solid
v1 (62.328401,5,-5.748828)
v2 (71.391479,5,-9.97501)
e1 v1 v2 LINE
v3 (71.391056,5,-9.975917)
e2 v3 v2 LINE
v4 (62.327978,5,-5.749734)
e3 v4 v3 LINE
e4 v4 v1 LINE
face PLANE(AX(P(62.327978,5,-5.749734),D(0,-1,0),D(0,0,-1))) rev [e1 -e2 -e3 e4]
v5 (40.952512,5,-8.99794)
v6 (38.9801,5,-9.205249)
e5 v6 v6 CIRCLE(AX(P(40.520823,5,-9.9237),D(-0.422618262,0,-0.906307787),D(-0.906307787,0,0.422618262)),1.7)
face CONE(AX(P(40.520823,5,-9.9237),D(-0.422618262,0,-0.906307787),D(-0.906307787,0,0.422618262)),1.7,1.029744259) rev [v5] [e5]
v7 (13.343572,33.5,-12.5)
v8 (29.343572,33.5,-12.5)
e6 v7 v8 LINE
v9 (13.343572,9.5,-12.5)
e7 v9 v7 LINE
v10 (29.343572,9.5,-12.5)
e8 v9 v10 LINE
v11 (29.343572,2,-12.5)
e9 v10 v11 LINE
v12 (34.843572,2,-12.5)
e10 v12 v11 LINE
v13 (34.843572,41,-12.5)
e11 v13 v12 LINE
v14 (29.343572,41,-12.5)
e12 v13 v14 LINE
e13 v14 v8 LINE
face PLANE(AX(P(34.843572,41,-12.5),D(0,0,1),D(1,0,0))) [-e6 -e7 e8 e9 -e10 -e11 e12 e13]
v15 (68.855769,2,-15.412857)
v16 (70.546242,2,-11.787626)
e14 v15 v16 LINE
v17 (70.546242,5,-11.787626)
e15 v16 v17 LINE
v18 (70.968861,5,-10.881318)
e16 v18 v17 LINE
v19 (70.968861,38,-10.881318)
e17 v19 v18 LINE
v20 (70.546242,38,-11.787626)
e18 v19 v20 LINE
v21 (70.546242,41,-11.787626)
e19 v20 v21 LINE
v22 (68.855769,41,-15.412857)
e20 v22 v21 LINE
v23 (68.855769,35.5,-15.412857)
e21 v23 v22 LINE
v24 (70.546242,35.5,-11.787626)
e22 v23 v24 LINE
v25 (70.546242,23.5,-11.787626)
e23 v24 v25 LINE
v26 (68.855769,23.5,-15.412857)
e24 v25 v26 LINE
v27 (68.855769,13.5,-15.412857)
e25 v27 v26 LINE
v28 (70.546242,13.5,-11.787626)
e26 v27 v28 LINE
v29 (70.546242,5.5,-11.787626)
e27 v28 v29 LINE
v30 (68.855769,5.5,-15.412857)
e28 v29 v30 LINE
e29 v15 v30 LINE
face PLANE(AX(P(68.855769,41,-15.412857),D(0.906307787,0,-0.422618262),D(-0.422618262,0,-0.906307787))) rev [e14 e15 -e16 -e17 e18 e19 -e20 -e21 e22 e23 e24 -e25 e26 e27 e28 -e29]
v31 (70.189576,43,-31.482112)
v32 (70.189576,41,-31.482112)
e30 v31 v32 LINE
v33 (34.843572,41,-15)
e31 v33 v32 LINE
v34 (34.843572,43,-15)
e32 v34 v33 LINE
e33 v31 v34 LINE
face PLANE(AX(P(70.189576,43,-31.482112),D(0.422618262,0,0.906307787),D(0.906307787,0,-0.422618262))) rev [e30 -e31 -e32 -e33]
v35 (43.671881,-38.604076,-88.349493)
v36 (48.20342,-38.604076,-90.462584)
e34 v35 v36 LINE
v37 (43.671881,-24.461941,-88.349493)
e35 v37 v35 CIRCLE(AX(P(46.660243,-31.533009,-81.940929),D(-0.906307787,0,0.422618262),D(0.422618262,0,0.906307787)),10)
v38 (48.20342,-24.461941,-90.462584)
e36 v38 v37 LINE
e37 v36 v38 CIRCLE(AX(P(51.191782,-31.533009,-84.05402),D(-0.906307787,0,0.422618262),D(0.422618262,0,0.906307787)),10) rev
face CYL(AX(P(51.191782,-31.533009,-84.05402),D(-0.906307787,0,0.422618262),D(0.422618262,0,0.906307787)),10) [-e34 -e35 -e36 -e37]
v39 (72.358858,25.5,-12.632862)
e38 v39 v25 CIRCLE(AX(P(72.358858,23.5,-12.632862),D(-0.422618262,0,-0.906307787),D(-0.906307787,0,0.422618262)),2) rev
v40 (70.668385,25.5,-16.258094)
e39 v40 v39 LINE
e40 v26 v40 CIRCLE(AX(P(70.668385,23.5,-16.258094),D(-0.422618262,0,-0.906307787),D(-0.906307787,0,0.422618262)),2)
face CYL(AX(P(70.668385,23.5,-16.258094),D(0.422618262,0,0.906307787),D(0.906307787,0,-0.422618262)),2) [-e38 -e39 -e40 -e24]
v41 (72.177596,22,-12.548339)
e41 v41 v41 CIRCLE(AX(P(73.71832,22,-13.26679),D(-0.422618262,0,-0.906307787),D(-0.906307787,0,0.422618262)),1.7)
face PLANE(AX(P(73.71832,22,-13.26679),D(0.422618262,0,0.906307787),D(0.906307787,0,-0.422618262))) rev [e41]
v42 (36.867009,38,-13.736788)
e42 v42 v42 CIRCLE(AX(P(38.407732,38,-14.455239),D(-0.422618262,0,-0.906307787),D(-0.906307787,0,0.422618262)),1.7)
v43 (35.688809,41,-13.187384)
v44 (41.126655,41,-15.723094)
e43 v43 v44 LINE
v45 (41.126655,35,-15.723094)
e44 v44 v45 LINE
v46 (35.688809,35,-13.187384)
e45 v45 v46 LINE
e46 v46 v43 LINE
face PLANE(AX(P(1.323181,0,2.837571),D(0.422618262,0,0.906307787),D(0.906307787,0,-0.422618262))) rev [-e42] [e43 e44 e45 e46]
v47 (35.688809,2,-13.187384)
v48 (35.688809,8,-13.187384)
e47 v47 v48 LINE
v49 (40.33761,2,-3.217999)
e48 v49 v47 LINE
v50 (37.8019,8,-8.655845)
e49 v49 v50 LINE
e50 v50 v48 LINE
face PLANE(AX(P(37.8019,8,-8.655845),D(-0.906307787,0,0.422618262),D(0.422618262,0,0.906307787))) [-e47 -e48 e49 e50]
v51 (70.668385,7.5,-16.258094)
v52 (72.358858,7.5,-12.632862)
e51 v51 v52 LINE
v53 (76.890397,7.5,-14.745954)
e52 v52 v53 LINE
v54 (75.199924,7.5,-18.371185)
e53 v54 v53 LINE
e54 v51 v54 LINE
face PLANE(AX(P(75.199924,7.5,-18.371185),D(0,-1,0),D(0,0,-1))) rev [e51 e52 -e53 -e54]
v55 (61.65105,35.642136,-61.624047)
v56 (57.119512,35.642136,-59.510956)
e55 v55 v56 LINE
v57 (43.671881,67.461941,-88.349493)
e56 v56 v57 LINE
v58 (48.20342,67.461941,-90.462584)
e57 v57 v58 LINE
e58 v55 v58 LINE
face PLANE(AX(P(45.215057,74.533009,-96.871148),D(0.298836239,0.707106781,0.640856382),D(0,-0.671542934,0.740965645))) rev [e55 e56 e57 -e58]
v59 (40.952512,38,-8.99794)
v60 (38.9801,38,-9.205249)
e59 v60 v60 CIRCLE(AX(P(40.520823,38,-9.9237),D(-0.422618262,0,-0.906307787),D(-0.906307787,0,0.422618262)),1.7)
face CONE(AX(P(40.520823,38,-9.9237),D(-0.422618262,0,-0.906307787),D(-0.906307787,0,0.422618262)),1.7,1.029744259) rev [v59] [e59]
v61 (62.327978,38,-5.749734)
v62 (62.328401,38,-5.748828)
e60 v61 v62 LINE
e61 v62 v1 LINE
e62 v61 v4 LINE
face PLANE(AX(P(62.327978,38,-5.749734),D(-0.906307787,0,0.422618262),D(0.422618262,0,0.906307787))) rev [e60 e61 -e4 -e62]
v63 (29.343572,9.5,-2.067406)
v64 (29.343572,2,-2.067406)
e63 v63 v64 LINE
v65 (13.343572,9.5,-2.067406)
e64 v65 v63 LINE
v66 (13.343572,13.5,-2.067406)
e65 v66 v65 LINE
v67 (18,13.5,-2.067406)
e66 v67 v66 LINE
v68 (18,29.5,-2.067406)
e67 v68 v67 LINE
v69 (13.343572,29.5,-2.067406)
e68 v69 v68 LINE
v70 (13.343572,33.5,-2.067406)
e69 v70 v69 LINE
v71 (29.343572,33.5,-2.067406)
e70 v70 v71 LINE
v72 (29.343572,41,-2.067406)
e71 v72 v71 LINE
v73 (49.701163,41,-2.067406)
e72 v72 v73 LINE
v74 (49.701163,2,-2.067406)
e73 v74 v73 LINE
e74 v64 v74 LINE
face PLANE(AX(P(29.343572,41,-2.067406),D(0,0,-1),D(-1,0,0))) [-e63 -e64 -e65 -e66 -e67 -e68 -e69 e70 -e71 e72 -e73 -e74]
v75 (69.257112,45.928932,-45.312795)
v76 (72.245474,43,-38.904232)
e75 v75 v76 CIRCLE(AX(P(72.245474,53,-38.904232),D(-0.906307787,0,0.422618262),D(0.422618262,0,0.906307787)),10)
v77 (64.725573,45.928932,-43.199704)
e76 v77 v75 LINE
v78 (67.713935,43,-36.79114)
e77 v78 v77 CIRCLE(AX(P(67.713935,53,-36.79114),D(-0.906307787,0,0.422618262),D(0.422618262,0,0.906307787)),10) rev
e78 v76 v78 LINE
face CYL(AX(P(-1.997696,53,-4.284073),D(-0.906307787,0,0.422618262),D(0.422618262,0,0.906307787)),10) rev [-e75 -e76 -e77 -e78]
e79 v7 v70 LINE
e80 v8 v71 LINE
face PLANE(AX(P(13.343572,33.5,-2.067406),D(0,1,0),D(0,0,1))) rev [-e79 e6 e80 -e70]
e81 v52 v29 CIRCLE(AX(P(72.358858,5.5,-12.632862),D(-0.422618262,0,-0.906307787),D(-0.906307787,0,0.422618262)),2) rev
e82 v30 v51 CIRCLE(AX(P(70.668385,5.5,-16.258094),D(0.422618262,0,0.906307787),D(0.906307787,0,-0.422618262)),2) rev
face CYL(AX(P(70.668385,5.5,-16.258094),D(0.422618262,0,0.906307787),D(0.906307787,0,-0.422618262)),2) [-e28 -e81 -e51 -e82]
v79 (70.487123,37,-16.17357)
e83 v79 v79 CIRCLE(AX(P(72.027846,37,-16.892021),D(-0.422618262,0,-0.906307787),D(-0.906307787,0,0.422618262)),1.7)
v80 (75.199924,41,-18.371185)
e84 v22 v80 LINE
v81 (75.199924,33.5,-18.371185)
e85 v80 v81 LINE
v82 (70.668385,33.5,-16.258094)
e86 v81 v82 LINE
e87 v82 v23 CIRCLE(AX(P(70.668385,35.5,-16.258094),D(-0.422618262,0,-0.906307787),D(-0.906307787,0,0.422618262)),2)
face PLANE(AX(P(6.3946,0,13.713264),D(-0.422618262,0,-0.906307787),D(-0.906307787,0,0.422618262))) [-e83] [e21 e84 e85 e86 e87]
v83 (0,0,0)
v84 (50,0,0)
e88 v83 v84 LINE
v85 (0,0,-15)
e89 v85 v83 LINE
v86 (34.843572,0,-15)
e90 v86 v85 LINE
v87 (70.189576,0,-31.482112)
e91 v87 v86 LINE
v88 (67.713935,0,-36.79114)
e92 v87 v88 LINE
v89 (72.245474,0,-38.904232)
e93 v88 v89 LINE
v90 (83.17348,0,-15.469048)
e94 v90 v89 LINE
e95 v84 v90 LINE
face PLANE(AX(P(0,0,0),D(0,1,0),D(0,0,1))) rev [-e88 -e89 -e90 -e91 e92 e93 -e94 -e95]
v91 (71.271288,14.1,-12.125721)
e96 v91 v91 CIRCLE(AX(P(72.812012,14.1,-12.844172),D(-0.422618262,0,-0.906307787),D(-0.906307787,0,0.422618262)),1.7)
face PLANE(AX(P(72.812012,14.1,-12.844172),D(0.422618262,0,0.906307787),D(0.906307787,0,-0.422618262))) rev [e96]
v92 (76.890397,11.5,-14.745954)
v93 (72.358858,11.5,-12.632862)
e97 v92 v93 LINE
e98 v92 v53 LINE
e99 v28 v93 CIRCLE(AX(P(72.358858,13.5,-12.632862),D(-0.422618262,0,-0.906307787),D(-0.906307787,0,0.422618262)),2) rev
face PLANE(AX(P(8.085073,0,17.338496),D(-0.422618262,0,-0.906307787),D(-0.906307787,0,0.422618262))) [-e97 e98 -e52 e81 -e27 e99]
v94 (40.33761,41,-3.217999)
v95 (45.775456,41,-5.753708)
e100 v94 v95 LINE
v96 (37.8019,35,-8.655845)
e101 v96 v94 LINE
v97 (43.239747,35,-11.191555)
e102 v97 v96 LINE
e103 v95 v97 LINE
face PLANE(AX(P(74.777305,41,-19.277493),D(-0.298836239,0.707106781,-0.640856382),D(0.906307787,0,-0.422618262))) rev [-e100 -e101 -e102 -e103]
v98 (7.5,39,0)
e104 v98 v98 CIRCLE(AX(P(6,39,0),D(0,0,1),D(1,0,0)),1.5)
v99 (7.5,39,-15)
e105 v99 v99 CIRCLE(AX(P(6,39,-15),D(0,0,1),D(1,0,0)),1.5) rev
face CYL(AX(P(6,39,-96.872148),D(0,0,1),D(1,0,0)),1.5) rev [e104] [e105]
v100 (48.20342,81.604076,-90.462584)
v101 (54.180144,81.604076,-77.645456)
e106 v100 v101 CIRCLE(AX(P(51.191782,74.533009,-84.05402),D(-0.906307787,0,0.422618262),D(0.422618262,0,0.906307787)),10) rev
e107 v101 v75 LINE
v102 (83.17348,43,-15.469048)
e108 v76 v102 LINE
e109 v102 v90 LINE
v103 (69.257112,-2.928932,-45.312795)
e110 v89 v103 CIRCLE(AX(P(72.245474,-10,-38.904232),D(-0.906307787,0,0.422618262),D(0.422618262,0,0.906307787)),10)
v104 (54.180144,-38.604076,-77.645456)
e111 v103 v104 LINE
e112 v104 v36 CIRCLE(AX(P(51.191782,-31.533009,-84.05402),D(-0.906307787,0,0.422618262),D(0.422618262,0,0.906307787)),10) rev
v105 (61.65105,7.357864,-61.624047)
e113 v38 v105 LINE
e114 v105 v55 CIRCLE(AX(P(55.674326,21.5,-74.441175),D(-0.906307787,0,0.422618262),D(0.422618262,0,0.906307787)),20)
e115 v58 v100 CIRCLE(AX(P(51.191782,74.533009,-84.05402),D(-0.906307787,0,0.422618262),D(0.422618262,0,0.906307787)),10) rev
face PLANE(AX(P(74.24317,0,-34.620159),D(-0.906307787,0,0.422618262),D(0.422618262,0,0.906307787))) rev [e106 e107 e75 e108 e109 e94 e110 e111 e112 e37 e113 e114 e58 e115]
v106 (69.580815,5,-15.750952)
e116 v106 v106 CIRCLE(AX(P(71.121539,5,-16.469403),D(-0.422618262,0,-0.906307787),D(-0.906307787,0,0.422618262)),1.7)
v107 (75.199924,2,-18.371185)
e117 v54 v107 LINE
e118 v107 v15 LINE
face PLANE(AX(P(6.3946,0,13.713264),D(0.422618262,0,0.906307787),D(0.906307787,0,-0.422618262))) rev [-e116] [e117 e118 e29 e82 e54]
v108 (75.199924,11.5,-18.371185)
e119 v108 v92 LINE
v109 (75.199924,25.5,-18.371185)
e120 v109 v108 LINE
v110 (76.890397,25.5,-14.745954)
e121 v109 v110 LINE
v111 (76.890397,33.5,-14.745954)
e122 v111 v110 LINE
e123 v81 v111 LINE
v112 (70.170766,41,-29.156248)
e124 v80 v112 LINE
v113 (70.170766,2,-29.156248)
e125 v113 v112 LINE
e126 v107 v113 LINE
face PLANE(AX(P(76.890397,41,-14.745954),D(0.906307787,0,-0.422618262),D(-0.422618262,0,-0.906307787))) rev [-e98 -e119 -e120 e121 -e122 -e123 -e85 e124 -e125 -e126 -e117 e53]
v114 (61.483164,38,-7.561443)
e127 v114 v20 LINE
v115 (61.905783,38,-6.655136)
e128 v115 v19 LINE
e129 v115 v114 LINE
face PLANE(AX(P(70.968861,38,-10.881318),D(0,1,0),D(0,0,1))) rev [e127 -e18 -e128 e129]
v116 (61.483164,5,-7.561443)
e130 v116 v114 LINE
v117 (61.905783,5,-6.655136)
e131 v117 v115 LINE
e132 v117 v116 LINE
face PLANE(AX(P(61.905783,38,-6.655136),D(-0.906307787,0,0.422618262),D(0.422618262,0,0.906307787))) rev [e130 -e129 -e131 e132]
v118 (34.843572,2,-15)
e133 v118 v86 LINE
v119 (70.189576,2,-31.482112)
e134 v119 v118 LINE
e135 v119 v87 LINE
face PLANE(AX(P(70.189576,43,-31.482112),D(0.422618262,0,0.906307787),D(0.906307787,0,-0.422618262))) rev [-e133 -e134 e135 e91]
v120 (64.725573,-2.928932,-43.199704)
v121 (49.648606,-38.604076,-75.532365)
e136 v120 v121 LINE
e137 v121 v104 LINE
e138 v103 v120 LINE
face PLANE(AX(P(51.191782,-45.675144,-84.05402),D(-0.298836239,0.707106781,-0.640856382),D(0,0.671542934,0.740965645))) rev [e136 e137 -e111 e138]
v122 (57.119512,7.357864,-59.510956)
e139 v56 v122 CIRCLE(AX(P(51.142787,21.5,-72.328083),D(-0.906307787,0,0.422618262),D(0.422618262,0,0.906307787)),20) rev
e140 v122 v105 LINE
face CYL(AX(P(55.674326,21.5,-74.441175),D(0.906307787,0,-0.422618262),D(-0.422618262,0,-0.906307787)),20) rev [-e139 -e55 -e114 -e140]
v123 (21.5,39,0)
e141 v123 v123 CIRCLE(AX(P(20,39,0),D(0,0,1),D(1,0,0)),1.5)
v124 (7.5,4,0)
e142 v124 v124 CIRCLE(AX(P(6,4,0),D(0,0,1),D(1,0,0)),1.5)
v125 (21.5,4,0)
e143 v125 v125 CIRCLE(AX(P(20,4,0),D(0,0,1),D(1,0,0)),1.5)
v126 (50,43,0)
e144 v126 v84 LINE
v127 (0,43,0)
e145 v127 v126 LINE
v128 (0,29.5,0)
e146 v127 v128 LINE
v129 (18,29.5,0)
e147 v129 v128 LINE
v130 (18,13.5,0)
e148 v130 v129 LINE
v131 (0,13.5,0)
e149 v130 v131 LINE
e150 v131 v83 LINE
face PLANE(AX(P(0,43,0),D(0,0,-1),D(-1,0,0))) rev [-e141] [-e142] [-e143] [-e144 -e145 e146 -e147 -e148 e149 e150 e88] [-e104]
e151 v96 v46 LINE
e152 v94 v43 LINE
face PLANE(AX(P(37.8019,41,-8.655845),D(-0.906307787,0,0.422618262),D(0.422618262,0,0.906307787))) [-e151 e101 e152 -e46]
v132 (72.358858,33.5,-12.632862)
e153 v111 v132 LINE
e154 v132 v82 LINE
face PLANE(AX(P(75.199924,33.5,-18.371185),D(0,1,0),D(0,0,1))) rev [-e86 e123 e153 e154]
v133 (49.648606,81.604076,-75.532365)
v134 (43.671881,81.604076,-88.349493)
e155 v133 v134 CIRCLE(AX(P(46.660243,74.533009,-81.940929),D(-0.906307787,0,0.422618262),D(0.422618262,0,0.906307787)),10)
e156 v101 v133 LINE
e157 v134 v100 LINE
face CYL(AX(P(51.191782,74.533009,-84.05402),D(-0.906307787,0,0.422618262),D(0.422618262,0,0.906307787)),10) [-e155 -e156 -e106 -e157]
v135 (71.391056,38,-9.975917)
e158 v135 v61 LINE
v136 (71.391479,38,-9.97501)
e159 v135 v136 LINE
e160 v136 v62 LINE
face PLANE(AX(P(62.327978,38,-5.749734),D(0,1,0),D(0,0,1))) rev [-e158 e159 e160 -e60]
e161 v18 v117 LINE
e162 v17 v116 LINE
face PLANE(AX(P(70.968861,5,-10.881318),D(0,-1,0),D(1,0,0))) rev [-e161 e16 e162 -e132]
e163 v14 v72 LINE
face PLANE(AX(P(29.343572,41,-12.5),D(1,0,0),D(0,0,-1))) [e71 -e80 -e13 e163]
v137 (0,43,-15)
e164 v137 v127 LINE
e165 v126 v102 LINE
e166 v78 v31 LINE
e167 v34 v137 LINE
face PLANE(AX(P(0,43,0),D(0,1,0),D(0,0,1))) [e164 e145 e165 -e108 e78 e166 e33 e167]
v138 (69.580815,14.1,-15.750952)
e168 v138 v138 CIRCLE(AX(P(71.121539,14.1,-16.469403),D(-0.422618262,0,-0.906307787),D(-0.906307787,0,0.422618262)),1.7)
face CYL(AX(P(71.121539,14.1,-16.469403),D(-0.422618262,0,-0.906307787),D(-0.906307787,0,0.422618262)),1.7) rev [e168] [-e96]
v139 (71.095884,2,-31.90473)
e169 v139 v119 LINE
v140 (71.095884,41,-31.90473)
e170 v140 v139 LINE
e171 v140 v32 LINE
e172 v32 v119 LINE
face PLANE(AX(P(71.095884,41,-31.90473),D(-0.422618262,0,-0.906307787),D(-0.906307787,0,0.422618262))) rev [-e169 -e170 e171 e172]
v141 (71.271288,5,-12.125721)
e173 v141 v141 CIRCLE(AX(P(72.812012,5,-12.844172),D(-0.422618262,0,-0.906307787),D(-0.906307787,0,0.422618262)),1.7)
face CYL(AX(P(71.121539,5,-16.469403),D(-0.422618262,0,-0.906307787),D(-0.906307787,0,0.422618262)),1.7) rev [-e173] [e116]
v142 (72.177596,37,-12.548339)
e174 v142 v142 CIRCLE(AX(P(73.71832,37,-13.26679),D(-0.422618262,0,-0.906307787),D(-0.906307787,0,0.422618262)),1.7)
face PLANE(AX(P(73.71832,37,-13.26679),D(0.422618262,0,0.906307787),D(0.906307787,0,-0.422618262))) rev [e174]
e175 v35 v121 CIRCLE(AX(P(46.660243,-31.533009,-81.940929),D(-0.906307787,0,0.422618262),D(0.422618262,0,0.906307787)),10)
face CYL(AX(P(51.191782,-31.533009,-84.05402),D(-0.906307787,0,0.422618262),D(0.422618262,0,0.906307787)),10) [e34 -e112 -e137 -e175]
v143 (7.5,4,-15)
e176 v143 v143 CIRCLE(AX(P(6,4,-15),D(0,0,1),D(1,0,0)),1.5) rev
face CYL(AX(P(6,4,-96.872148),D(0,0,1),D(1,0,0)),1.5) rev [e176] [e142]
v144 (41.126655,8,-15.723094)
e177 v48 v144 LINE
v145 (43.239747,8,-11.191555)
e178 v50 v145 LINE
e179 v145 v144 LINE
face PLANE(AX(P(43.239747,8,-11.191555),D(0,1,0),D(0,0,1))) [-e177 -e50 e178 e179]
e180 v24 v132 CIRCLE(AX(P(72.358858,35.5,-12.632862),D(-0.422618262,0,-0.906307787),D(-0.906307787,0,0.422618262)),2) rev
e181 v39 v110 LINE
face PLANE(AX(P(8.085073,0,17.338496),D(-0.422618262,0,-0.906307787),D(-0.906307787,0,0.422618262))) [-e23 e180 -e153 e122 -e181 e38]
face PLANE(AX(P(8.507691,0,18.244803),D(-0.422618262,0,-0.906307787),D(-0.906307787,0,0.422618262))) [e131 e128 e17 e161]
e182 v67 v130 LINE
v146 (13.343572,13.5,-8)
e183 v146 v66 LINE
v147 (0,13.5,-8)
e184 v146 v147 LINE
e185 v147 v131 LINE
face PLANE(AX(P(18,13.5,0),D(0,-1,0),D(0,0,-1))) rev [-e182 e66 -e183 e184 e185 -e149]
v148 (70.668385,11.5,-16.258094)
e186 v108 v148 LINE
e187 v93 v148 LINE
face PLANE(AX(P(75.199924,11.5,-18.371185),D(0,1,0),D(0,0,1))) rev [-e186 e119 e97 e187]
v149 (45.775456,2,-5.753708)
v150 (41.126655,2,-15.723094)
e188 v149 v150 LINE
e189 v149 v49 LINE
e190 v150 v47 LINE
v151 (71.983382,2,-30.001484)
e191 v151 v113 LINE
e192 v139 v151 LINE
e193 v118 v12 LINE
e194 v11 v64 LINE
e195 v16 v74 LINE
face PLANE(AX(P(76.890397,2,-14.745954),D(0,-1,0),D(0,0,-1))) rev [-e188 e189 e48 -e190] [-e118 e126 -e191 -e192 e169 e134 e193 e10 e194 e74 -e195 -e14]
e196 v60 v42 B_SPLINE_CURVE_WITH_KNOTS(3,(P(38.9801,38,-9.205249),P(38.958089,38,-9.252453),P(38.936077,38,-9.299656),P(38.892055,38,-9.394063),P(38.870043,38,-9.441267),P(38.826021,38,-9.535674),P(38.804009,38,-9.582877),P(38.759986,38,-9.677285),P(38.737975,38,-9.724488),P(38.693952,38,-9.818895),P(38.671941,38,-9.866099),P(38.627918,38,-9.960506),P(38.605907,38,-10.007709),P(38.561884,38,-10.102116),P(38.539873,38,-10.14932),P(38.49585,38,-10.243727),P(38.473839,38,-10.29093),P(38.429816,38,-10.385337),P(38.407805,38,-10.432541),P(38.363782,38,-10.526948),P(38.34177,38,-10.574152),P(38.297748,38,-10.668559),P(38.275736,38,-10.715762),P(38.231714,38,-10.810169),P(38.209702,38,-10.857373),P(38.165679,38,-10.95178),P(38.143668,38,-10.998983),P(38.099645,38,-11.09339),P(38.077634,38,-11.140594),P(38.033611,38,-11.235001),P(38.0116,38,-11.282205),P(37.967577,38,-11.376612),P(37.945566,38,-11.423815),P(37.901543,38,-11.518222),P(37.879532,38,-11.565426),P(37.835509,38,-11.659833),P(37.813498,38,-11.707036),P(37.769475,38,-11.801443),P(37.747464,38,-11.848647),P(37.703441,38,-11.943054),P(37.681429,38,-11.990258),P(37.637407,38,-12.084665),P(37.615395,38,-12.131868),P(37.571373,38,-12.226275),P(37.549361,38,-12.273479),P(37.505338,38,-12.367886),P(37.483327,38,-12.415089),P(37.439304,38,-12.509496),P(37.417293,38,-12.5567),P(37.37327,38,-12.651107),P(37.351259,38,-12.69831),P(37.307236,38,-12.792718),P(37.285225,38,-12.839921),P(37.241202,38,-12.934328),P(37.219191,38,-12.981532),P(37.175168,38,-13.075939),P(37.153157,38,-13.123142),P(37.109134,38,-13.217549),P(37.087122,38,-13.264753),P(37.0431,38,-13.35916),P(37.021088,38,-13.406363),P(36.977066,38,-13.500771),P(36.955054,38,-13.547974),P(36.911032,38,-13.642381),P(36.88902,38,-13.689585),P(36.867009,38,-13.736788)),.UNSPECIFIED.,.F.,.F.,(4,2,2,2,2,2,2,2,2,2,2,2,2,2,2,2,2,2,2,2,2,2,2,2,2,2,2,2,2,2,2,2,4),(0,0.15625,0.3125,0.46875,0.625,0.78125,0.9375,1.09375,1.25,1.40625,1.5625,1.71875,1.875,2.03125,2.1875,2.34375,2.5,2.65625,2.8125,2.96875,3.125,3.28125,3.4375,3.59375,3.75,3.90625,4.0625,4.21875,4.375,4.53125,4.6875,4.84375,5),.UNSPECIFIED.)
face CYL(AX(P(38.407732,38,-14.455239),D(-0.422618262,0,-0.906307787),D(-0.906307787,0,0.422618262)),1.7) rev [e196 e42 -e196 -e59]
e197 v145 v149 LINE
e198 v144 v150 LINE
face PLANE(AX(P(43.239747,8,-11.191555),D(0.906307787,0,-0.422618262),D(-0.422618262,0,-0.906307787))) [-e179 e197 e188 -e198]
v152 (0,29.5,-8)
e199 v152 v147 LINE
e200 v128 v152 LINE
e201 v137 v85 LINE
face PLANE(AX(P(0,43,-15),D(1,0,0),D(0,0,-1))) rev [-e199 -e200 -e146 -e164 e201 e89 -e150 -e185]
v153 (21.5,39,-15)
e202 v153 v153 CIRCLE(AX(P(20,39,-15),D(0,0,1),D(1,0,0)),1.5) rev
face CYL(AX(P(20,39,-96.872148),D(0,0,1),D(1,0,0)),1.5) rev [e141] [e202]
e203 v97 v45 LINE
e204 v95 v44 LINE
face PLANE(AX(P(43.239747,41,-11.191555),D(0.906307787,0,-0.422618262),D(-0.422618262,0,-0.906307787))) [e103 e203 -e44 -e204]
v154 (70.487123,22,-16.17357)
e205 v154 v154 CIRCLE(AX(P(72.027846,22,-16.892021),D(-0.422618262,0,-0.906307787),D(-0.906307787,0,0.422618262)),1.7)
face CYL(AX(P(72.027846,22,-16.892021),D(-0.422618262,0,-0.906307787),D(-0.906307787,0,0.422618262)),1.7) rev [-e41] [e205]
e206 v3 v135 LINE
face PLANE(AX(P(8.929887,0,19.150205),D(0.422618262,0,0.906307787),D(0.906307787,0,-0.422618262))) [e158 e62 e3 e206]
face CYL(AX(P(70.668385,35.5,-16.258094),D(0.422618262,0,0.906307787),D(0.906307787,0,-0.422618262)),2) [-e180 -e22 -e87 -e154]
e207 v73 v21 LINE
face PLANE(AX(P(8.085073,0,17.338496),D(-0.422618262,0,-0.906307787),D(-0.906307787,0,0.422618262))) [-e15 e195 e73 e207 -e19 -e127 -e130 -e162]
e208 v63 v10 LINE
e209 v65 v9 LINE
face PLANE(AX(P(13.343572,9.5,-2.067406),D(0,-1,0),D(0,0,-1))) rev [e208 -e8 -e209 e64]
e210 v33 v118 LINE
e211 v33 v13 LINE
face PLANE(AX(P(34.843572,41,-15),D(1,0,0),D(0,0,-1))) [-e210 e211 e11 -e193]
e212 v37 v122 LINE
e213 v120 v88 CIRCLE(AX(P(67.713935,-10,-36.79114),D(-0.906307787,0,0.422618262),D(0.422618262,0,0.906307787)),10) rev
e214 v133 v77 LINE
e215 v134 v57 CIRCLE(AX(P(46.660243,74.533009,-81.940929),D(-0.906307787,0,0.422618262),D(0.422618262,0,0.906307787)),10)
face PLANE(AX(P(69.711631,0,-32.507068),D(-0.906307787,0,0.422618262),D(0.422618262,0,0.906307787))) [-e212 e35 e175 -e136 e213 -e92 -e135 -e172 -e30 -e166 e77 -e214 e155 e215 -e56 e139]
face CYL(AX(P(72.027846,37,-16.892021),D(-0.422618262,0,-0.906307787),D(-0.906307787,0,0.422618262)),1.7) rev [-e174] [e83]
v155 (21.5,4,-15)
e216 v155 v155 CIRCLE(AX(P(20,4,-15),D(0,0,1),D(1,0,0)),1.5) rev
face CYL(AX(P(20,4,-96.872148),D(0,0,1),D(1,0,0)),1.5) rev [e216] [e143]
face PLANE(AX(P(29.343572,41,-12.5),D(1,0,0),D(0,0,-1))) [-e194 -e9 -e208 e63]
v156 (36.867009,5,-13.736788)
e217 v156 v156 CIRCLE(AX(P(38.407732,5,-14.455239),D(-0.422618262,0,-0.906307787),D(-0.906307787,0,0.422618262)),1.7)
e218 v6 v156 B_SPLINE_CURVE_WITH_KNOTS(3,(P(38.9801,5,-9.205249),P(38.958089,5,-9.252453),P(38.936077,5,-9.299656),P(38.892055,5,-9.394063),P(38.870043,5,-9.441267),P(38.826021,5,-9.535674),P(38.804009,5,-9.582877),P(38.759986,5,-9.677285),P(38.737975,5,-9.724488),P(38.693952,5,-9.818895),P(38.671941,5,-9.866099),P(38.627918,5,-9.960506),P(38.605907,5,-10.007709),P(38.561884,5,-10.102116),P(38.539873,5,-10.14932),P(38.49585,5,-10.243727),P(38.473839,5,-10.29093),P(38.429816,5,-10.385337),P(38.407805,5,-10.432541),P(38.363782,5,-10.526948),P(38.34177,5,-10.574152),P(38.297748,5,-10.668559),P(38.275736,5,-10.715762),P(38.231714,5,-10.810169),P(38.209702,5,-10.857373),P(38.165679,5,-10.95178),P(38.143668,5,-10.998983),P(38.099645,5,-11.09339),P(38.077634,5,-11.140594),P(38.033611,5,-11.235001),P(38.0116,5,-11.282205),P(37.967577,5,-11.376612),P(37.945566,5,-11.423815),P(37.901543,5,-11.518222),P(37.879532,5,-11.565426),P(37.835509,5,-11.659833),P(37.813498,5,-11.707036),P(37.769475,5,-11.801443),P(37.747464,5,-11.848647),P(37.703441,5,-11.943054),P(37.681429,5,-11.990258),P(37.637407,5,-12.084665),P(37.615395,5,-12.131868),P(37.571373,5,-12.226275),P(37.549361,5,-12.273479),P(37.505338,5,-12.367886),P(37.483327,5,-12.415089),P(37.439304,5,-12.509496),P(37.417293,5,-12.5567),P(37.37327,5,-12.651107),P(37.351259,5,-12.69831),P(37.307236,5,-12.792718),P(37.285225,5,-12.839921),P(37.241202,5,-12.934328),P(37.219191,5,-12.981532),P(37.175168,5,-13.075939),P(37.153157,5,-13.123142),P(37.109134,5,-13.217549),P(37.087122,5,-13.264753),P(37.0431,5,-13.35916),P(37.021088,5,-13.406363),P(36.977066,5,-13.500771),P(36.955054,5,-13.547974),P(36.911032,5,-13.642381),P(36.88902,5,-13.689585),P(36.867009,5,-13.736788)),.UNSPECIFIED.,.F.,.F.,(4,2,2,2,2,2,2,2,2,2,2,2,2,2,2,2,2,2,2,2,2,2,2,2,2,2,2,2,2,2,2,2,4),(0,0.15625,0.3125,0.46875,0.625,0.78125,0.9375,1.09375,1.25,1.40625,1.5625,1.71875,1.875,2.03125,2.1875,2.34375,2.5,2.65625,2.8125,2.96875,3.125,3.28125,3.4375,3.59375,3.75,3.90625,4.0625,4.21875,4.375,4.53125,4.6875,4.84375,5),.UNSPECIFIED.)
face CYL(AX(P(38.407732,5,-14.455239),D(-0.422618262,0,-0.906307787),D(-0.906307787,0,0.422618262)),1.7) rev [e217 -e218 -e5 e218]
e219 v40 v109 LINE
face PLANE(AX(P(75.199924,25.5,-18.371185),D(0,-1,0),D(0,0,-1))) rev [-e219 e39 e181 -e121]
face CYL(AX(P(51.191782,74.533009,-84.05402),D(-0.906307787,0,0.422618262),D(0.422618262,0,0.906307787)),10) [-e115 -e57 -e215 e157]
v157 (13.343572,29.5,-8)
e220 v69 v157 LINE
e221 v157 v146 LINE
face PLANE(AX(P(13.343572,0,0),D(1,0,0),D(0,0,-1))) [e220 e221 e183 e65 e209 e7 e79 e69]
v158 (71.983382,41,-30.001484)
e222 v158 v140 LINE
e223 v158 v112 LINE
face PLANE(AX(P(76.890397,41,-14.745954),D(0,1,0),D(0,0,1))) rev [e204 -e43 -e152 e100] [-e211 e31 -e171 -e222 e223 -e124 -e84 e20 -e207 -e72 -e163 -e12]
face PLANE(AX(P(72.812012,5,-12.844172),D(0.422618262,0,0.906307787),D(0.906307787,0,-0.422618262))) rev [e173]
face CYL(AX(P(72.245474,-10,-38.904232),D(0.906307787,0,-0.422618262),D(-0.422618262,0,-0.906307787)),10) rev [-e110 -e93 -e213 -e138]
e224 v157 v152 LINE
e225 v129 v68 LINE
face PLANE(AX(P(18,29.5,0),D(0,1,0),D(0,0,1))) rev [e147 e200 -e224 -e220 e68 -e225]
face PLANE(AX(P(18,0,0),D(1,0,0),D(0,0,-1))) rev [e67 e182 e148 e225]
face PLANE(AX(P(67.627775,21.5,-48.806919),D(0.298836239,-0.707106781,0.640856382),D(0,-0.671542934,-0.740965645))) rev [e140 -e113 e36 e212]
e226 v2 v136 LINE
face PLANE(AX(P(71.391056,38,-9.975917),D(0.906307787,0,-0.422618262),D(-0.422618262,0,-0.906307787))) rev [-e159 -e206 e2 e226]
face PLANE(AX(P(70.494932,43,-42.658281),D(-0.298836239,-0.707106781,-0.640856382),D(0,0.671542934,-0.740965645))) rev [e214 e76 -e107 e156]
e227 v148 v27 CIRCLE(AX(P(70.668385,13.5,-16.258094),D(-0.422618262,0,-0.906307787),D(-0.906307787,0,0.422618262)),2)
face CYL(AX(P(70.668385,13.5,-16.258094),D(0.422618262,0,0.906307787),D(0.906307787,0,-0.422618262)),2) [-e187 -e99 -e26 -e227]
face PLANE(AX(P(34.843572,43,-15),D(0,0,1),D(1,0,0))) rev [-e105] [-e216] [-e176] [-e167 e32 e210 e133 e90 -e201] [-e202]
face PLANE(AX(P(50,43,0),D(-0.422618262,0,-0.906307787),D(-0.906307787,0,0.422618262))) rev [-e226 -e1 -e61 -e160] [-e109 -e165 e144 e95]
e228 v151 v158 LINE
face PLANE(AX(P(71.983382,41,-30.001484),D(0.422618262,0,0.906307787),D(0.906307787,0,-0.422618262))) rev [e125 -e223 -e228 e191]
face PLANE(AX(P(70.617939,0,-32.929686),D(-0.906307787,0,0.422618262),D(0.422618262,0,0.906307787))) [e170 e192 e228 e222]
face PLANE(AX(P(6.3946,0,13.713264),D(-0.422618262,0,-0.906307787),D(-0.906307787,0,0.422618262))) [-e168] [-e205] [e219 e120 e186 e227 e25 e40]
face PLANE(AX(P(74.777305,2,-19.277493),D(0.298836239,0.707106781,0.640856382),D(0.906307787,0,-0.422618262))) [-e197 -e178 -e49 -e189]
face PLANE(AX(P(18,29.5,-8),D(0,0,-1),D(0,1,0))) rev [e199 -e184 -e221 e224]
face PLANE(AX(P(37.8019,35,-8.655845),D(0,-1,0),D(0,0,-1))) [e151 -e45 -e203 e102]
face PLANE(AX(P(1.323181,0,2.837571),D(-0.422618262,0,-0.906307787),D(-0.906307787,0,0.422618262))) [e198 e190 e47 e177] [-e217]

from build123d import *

# Parameters (mm, degrees)
AUFSATZ_LINEAR_AUSTRAGEN1_DEPTH      = 43
AUFSATZ_LINEAR_AUSTRAGEN2_DEPTH      = 5
SCHNITT_LINEAR_AUSTRAGEN1_REACH      = 157.451
SKIZZE3_R                            = 1.5
SKIZZE4_W                            = 8
SKIZZE4_H                            = 16
SCHNITT_LINEAR_AUSTRAGEN2_DEPTH      = 18
SKIZZE5_W                            = 30
SKIZZE5_H                            = 39
SCHNITT_LINEAR_AUSTRAGEN3_DEPTH      = 18
SKIZZE6_W                            = 7
SKIZZE6_H                            = 7.5
SKIZZE6_H_2                          = 14
SKIZZE6_H_3                          = 5.5
AUFSATZ_LINEAR_AUSTRAGEN3_DEPTH      = 4
VERRUNDUNG1_R                        = 2
F_3_4_3_4_DURCHMESSER_BOHRUNG1_D     = 3.4
F_3_4_3_4_DURCHMESSER_BOHRUNG1_DEPTH = 4
SKIZZE10_W                           = 10
SKIZZE10_H                           = 33
SCHNITT_LINEAR_AUSTRAGEN4_DEPTH      = 1
SKIZZE11_W                           = 10
SKIZZE11_H                           = 33
SCHNITT_LINEAR_AUSTRAGEN5_DEPTH      = 0.001
SCHNITT_LINEAR_AUSTRAGEN7_DEPTH      = 39
SKIZZE15_W                           = 10.432594073
SKIZZE15_H                           = 24
SCHNITT_LINEAR_AUSTRAGEN10_DEPTH     = 16
SKIZZE16_W                           = 2.1
SKIZZE16_H                           = 39
SCHNITT_LINEAR_AUSTRAGEN11_DEPTH     = 2
VERRUNDUNG2_R                        = 20
VERRUNDUNG3_R                        = 10
SKIZZE17_W                           = 6
SKIZZE17_H                           = 6
AUFSATZ_LINEAR_AUSTRAGEN4_DEPTH      = 5
FASE1_SIZE                           = 6
F_3_4_3_4_DURCHMESSER_BOHRUNG2_D     = 3.4
F_3_4_3_4_DURCHMESSER_BOHRUNG2_DEPTH = 5
F_3_4_3_4_DURCHMESSER_BOHRUNG2_TIP   = 1.021463052


with BuildPart() as part:
    # Skizze1 → Aufsatz-Linear austragen1 (new body)
    with BuildSketch(Plane(origin=(0, 0, 0), x_dir=(1, 0, 0), z_dir=(0, 1, 0))):
        Polygon((0, 0), (50, 0), (78.641941074, 13.355956467), (70.189575839, 31.482112208), (34.843572145, 15), (0, 15), align=None)
    extrude(amount=AUFSATZ_LINEAR_AUSTRAGEN1_DEPTH)

    # Skizze2 → Aufsatz-Linear austragen2 (add)
    with BuildSketch(Plane(origin=(69.711631316, 0, -32.507067545), x_dir=(-0.4226182617407004, 0, -0.9063077870366495), z_dir=(0.9063077870366495, 0, -0.4226182617407004))):
        Polygon((-21.130913087, 43), (8.869086913, 43), (54.544231126, 88.675144213), (68.686366749, 74.533008589), (15.65335816, 21.5), (68.686366749, -31.533008589), (54.544231126, -45.675144213), (8.869086913, 0), (-21.130913087, 0), align=None)
    extrude(amount=AUFSATZ_LINEAR_AUSTRAGEN2_DEPTH)

    # Skizze3 → Schnitt-Linear austragen1 (cut, up to next)
    with BuildSketch(Plane.XY, mode=Mode.PRIVATE) as schnitt_linear_austragen1_sk1:
        with Locations((6, 39)):
            Circle(SKIZZE3_R)
    schnitt_linear_austragen1_tool1 = extrude(schnitt_linear_austragen1_sk1.sketch, amount=-SCHNITT_LINEAR_AUSTRAGEN1_REACH, mode=Mode.PRIVATE) & part.part
    # Skizze3 → Schnitt-Linear austragen1 (cut, up to next)
    with BuildSketch(Plane.XY, mode=Mode.PRIVATE) as schnitt_linear_austragen1_sk2:
        with Locations((20, 39)):
            Circle(SKIZZE3_R)
    schnitt_linear_austragen1_tool2 = extrude(schnitt_linear_austragen1_sk2.sketch, amount=-SCHNITT_LINEAR_AUSTRAGEN1_REACH, mode=Mode.PRIVATE) & part.part
    # Skizze3 → Schnitt-Linear austragen1 (cut, up to next)
    with BuildSketch(Plane.XY, mode=Mode.PRIVATE) as schnitt_linear_austragen1_sk3:
        with Locations((6, 4)):
            Circle(SKIZZE3_R)
    schnitt_linear_austragen1_tool3 = extrude(schnitt_linear_austragen1_sk3.sketch, amount=-SCHNITT_LINEAR_AUSTRAGEN1_REACH, mode=Mode.PRIVATE) & part.part
    # Skizze3 → Schnitt-Linear austragen1 (cut, up to next)
    with BuildSketch(Plane.XY, mode=Mode.PRIVATE) as schnitt_linear_austragen1_sk4:
        with Locations((20, 4)):
            Circle(SKIZZE3_R)
    schnitt_linear_austragen1_tool4 = extrude(schnitt_linear_austragen1_sk4.sketch, amount=-SCHNITT_LINEAR_AUSTRAGEN1_REACH, mode=Mode.PRIVATE) & part.part
    add(schnitt_linear_austragen1_tool1.solids().sort_by_distance((6, 39, 0))[0], mode=Mode.SUBTRACT)
    add(schnitt_linear_austragen1_tool2.solids().sort_by_distance((20, 39, 0))[0], mode=Mode.SUBTRACT)
    add(schnitt_linear_austragen1_tool3.solids().sort_by_distance((6, 4, 0))[0], mode=Mode.SUBTRACT)
    add(schnitt_linear_austragen1_tool4.solids().sort_by_distance((20, 4, 0))[0], mode=Mode.SUBTRACT)

    # Skizze4 → Schnitt-Linear austragen2 (cut)
    with BuildSketch(Plane.ZY):
        with Locations((-4, 21.5)):
            Rectangle(SKIZZE4_W, SKIZZE4_H)
    extrude(amount=-SCHNITT_LINEAR_AUSTRAGEN2_DEPTH, mode=Mode.SUBTRACT)

    # Skizze5 → Schnitt-Linear austragen3 (cut)
    with BuildSketch(Plane(origin=(0.477944523, 0, 1.024955337), x_dir=(-0.9063077870366492, 0, 0.4226182617407011), z_dir=(-0.4226182617407011, 0, -0.9063077870366492))):
        with Locations((-60.918274689, 21.5)):
            Rectangle(SKIZZE5_W, SKIZZE5_H)
    extrude(amount=-SCHNITT_LINEAR_AUSTRAGEN3_DEPTH, mode=Mode.SUBTRACT)

    # Skizze6 → Aufsatz-Linear austragen3 (add)
    with BuildSketch(Plane(origin=(8.085073234, 0, 17.338495504), x_dir=(-0.9063077870366492, 0, 0.42261826174070133), z_dir=(-0.42261826174070133, 0, -0.9063077870366492))):
        with Locations((-72.418274689, 37.25)):
            Rectangle(SKIZZE6_W, SKIZZE6_H)
        with Locations((-72.418274689, 18.5)):
            Rectangle(SKIZZE6_W, SKIZZE6_H_2)
        with Locations((-72.418274689, 4.75)):
            Rectangle(SKIZZE6_W, SKIZZE6_H_3)
    extrude(amount=AUFSATZ_LINEAR_AUSTRAGEN3_DEPTH)

    # Verrundung1
    verrundung1_edges = [part.edges().sort_by_distance(p)[0] for p in [
        (69.701005731, 33.5, -13.600241521),
        (69.701005731, 11.5, -13.600241521),
        (69.701005731, 25.5, -13.600241521),
        (69.701005731, 7.5, -13.600241521),
    ]]
    fillet(verrundung1_edges, radius=VERRUNDUNG1_R)

    # Ø3.4 (3.4) Durchmesser Bohrung1
    with Locations(Plane(origin=(6.394600187, 0, 13.713264356), x_dir=(-0.906307787036649, 0, 0.4226182617407016), z_dir=(-0.4226182617407016, 0, -0.906307787036649))):
        with Locations((-72.418274689, 37), (-72.418274689, 22), (-71.418274689, 14.1), (-71.418274689, 5)):
            Hole(F_3_4_3_4_DURCHMESSER_BOHRUNG1_D / 2, depth=F_3_4_3_4_DURCHMESSER_BOHRUNG1_DEPTH)

    # Skizze10 → Schnitt-Linear austragen4 (cut)
    with BuildSketch(Plane(origin=(8.085073234, 0, 17.338495504), x_dir=(-0.9063077870366492, 0, 0.42261826174070133), z_dir=(-0.42261826174070133, 0, -0.9063077870366492))):
        with Locations((-63.918274689, 21.5)):
            Rectangle(SKIZZE10_W, SKIZZE10_H)
    extrude(amount=-SCHNITT_LINEAR_AUSTRAGEN4_DEPTH, mode=Mode.SUBTRACT)

    # Skizze11 → Schnitt-Linear austragen5 (cut)
    with BuildSketch(Plane(origin=(8.930309758, 0, 19.151111078), x_dir=(0.9063077870366492, 0, -0.42261826174070133), z_dir=(0.42261826174070133, 0, 0.9063077870366492))):
        with Locations((63.918274689, 21.5)):
            Rectangle(SKIZZE11_W, SKIZZE11_H)
    extrude(amount=-SCHNITT_LINEAR_AUSTRAGEN5_DEPTH, mode=Mode.SUBTRACT)

    # Skizze12 → Schnitt-Linear austragen7 (cut)
    with BuildSketch(Plane(origin=(0, 2, 0), x_dir=(1, 0, 0), z_dir=(0, 1, 0))):
        Polygon((49.701163152, 2.067405927), (42.094034441, 18.380946094), (34.843572145, 15), (34.843572145, 12.5), (29.343572145, 12.5), (29.343572145, 2.067405927), align=None)
    extrude(amount=SCHNITT_LINEAR_AUSTRAGEN7_DEPTH, mode=Mode.SUBTRACT)

    # Skizze15 → Schnitt-Linear austragen10 (cut)
    with BuildSketch(Plane(origin=(29.343572145, 0, 0), x_dir=(0, 0, -1), z_dir=(1, 0, 0))):
        with Locations((7.283702963, 21.5)):
            Rectangle(SKIZZE15_W, SKIZZE15_H)
    extrude(amount=-SCHNITT_LINEAR_AUSTRAGEN10_DEPTH, mode=Mode.SUBTRACT)

    # Skizze16 → Schnitt-Linear austragen11 (cut)
    with BuildSketch(Plane(origin=(68.805323529, 0, -32.084449283), x_dir=(0.42261826174070133, 0, 0.9063077870366492), z_dir=(-0.9063077870366492, 0, 0.42261826174070133))):
        with Locations((2.180913087, 21.5)):
            Rectangle(SKIZZE16_W, SKIZZE16_H)
    extrude(amount=-SCHNITT_LINEAR_AUSTRAGEN11_DEPTH, mode=Mode.SUBTRACT)

    # Verrundung2
    verrundung2_edges = [part.edges().sort_by_distance(p)[0] for p in [
        (65.362005767, 21.5, -47.750373594),
    ]]
    fillet(verrundung2_edges, radius=VERRUNDUNG2_R)

    # Verrundung3
    verrundung3_edges = [part.edges().sort_by_distance(p)[0] for p in [
        (68.229162689, 43, -41.601735733),
        (68.229162689, 0, -41.601735733),
        (42.949287863, 74.533008589, -95.814602248),
        (48.926012637, 88.675144213, -82.997474607),
        (48.926012637, -45.675144213, -82.997474607),
        (42.949287863, -31.533008589, -95.814602248),
    ]]
    fillet(verrundung3_edges, radius=VERRUNDUNG3_R - 0.0001)  # a hair under: the kernel refuses the full size

    # Skizze17 → Aufsatz-Linear austragen4 (add)
    with BuildSketch(Plane(origin=(1.323181047, 0, 2.837570911), x_dir=(-0.9063077870366492, 0, 0.4226182617407011), z_dir=(-0.4226182617407011, 0, -0.9063077870366492))):
        with Locations((-40.918274689, 38)):
            Rectangle(SKIZZE17_W, SKIZZE17_H)
        with Locations((-40.918274689, 5)):
            Rectangle(SKIZZE17_W, SKIZZE17_H)
    extrude(amount=-AUFSATZ_LINEAR_AUSTRAGEN4_DEPTH)

    # Fase1
    fase1_edges = [part.edges().sort_by_distance(p)[0] for p in [
        (40.520823338, 2, -9.923700276),
        (40.520823338, 41, -9.923700276),
    ]]
    chamfer(fase1_edges, length=FASE1_SIZE - 0.0001)  # a hair under: the kernel refuses the full size

    # Ø3.4 (3.4) Durchmesser Bohrung2
    with Locations(Plane(origin=(1.323181047, 0, 2.837570911), x_dir=(-0.9063077870366492, 0, 0.4226182617407014), z_dir=(-0.42261826174070133, 0, -0.906307787036649))):
        with Locations((-40.918274689, 38), (-40.918274689, 5)):
            Hole(F_3_4_3_4_DURCHMESSER_BOHRUNG2_D / 2, depth=F_3_4_3_4_DURCHMESSER_BOHRUNG2_DEPTH)
            with Locations((0, 0, -(F_3_4_3_4_DURCHMESSER_BOHRUNG2_DEPTH + F_3_4_3_4_DURCHMESSER_BOHRUNG2_TIP / 2))):  # 118° drill point
                Cone(0, F_3_4_3_4_DURCHMESSER_BOHRUNG2_D / 2, F_3_4_3_4_DURCHMESSER_BOHRUNG2_TIP, mode=Mode.SUBTRACT)


solid = part.part
